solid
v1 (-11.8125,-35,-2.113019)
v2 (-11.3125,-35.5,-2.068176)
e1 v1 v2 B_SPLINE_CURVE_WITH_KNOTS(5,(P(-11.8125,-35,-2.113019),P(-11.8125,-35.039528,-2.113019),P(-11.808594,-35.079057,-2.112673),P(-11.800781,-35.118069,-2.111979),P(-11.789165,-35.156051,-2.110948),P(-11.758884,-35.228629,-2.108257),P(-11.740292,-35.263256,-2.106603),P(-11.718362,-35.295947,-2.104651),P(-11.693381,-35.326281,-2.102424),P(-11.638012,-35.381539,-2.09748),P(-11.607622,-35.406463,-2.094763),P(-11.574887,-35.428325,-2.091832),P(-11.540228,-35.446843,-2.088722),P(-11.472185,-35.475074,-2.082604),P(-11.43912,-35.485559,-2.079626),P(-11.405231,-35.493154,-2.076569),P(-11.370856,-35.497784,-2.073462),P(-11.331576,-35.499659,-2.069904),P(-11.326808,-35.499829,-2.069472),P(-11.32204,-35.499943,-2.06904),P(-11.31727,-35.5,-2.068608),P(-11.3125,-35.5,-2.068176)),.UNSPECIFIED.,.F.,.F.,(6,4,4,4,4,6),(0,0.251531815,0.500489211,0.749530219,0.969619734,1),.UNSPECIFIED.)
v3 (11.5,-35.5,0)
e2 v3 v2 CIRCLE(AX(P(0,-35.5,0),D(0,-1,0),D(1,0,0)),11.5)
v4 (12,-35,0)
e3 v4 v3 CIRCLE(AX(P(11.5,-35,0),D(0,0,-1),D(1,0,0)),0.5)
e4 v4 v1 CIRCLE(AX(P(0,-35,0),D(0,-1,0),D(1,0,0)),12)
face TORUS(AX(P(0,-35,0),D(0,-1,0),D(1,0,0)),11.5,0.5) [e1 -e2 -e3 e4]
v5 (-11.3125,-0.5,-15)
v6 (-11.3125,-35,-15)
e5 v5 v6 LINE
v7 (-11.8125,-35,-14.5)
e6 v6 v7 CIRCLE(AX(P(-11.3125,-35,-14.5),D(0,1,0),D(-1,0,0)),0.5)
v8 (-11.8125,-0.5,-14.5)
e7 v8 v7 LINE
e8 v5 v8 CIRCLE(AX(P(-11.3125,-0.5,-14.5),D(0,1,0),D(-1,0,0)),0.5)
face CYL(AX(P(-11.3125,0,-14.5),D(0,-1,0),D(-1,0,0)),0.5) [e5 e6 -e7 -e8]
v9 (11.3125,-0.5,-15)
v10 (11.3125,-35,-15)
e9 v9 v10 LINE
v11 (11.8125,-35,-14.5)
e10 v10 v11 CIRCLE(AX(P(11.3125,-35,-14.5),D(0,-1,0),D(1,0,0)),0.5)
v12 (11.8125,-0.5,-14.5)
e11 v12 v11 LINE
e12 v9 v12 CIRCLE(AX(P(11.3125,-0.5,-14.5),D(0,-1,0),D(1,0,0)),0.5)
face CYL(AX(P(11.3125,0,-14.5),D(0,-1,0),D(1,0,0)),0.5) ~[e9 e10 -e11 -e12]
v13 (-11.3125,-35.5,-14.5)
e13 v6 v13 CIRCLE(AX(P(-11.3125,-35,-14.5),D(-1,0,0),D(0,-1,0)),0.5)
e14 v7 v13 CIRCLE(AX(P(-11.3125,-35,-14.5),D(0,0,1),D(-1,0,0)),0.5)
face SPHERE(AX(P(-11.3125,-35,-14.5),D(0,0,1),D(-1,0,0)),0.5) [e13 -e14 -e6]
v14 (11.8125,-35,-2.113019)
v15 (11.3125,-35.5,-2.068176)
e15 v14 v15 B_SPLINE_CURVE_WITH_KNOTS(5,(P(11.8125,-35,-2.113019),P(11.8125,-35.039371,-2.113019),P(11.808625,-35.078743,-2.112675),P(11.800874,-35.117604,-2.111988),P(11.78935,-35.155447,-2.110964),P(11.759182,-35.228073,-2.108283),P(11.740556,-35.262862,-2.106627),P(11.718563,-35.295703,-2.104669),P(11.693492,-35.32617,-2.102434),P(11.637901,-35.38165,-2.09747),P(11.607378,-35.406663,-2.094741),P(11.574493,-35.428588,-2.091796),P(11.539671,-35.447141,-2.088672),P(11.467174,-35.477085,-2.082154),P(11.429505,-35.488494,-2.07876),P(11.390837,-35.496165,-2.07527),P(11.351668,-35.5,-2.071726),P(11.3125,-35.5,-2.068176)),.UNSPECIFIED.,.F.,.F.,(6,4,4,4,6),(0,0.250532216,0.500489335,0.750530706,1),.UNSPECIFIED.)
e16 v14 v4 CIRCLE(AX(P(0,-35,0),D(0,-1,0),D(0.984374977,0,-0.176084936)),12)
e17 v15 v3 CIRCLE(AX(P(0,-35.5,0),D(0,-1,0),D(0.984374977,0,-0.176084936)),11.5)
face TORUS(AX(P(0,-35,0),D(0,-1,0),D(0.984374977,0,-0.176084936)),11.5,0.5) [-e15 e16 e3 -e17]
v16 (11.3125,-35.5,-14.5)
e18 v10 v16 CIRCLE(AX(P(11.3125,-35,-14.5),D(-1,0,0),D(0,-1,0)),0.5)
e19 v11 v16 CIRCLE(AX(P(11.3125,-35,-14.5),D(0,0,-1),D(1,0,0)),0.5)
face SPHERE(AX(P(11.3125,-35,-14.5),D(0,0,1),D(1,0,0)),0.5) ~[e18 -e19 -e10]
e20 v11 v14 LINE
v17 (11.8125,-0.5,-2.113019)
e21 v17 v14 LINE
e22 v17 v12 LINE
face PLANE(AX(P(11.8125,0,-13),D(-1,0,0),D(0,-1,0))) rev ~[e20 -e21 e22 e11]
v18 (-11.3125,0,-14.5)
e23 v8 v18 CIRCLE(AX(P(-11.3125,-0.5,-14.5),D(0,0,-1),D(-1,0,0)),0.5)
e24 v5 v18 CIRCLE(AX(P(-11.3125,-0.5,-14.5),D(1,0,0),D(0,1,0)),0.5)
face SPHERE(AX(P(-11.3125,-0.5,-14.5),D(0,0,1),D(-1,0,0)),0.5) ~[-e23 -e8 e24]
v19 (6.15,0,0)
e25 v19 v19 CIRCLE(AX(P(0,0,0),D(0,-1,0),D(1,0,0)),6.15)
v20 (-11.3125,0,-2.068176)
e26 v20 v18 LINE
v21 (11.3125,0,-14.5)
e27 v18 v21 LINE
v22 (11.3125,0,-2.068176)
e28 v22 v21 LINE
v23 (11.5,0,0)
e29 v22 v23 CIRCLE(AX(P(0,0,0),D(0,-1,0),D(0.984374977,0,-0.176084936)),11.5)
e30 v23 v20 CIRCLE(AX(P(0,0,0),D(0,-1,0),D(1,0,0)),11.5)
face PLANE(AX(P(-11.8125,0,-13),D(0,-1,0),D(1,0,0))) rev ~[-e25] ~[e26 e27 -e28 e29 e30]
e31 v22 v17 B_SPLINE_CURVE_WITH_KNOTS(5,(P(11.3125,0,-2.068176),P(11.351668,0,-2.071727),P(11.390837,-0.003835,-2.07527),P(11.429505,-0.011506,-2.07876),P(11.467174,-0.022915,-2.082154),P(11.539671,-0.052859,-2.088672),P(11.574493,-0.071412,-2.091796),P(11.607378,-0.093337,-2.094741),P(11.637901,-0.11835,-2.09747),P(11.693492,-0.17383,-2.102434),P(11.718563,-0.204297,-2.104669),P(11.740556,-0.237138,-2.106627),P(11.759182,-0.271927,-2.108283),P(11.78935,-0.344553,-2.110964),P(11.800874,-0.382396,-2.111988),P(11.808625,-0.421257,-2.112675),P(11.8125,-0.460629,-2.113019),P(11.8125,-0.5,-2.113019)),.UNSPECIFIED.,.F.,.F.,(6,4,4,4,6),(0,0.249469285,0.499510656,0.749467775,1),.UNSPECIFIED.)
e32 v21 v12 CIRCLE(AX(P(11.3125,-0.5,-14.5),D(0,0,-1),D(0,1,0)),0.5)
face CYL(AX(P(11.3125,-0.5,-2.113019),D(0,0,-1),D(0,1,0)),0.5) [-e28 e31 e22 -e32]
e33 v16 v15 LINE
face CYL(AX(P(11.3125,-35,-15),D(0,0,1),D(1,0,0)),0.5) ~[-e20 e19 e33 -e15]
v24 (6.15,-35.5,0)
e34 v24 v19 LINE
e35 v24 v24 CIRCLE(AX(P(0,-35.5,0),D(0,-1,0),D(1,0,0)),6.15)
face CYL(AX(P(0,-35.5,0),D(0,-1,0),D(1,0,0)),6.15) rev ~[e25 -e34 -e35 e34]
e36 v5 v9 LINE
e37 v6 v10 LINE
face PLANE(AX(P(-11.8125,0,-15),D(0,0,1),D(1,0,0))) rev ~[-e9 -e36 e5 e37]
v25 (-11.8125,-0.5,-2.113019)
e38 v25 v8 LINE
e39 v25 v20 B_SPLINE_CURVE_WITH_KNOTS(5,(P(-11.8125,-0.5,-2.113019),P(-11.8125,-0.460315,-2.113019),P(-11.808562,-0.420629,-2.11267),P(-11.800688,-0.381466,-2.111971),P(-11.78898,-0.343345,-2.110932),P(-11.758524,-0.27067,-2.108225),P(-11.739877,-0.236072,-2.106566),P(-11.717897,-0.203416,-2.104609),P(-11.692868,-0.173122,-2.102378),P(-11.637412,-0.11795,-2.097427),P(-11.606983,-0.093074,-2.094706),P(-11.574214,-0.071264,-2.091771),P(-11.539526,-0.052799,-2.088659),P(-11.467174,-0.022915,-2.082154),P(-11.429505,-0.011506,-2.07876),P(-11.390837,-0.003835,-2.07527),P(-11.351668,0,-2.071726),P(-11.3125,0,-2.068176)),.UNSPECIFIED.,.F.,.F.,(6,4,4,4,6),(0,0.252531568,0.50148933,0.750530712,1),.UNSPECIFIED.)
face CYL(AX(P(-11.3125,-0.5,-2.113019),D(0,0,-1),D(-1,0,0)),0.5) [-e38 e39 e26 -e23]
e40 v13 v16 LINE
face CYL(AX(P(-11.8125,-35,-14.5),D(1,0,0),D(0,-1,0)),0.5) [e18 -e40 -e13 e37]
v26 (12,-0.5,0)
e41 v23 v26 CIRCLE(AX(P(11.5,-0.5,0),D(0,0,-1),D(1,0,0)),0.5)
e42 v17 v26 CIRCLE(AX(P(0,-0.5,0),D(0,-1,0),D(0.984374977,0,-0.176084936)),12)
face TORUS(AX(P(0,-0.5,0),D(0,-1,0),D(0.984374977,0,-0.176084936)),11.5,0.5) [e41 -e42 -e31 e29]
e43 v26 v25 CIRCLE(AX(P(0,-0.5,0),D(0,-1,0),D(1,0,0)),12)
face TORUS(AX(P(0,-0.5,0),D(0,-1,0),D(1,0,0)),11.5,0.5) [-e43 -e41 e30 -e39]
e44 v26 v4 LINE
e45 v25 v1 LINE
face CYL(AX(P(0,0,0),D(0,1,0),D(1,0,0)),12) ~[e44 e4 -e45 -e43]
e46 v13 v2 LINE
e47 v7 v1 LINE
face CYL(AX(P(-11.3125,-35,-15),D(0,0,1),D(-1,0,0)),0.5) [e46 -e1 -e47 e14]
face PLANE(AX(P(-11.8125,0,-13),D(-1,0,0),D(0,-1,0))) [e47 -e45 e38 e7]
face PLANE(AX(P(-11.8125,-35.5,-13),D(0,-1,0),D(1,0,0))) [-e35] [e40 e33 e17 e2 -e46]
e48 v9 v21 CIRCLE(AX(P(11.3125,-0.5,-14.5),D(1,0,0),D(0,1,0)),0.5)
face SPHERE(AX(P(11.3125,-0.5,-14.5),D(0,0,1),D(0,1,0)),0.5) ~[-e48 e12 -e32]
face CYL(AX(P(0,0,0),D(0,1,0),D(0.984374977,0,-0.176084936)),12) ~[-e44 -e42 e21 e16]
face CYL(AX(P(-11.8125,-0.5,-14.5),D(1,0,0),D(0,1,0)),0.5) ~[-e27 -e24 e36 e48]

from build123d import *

# Parameters (mm, degrees)
F1_R     = 6.15
F2_DEPTH = 35.5
F3_DEPTH = 35.501
F4_DEPTH = 2
F5_R     = 0.5


# Not quite as in the source:
# - two fillets or chamfers of one size are made in one step


with BuildPart() as f2:
    # F1 (on face) → F2 (new body)
    with BuildSketch(Plane.XZ):
        Circle(F1_R)
    extrude(amount=F2_DEPTH)


with BuildPart() as f2b:
    # F0 (on Front) → F2, piece 2 (new body)
    with BuildSketch(Plane.XZ):
        with BuildLine():
            ThreePointArc((11.8124997243, -2.1130192291), (11.9530330187, -1.0606609515), (12, 0))
            ThreePointArc((12, 0), (-1.0606609515, 11.9530330187), (-11.8124997243, -2.1130192291))
            Line((-11.8124997243, -2.1130192291), (-11.8124997243, 1))
            Line((-11.8124997243, 1), (11.8124997243, 1))
            Line((11.8124997243, 1), (11.8124997243, -2.1130192291))
        make_face()
        with BuildLine():
            Line((-11.8124997243, 1), (-11.8124997243, -2.1130192291))
            ThreePointArc((-11.8124997243, -2.1130192291), (0, -12), (11.8124997243, -2.1130192291))
            Line((11.8124997243, -2.1130192291), (11.8124997243, 1))
            Line((11.8124997243, 1), (-11.8124997243, 1))
        make_face()
        with BuildLine():
            ThreePointArc((11.8124997243, -2.1130192291), (0, -12), (-11.8124997243, -2.1130192291))
            Line((-11.8124997243, -2.1130192291), (-11.8124997243, -13))
            Line((-11.8124997243, -13), (11.8124997243, -13))
            Line((11.8124997243, -13), (11.8124997243, -2.1130192291))
        make_face()
    extrude(amount=F2_DEPTH)


with BuildPart() as f3_tool:
    # F3 (cut, through all): a face of the model
    f3_faces = [f2.part.faces().sort_by_distance(p)[0] for p in [
        (0, -35.5, 0),
    ]]
    extrude(f3_faces, amount=-F3_DEPTH)


with BuildPart() as f2_1:
    add(f2.part)

    # F3: cut by f3_tool
    add(f3_tool.part, mode=Mode.SUBTRACT)


with BuildPart() as f2b_1:
    add(f2b.part)

    # F3: cut by f3_tool
    add(f3_tool.part, mode=Mode.SUBTRACT)

    # F4 (add): a face of the model
    f4_faces = [f2b_1.faces().sort_by_distance(p)[0] for p in [
        (0, -17.75, -13),
    ]]
    extrude(f4_faces, amount=F4_DEPTH)

    # F5
    f5_edges = [f2b_1.edges().sort_by_distance(p)[0] for p in [
        (0, -35.5, 12),
        (-11.8125, -35.5, -8.55651),
        (11.8125, -35.5, -8.55651),
        (11.8125, 0, -8.55651),
        (-11.8125, 0, -8.55651),
        (0, 0, 12),
        (-11.8125, -17.75, -15),
        (0, 0, -15),
        (11.8125, -17.75, -15),
        (0, -35.5, -15),
    ]]
    fillet(f5_edges, radius=F5_R)


solid = f2b_1.part
